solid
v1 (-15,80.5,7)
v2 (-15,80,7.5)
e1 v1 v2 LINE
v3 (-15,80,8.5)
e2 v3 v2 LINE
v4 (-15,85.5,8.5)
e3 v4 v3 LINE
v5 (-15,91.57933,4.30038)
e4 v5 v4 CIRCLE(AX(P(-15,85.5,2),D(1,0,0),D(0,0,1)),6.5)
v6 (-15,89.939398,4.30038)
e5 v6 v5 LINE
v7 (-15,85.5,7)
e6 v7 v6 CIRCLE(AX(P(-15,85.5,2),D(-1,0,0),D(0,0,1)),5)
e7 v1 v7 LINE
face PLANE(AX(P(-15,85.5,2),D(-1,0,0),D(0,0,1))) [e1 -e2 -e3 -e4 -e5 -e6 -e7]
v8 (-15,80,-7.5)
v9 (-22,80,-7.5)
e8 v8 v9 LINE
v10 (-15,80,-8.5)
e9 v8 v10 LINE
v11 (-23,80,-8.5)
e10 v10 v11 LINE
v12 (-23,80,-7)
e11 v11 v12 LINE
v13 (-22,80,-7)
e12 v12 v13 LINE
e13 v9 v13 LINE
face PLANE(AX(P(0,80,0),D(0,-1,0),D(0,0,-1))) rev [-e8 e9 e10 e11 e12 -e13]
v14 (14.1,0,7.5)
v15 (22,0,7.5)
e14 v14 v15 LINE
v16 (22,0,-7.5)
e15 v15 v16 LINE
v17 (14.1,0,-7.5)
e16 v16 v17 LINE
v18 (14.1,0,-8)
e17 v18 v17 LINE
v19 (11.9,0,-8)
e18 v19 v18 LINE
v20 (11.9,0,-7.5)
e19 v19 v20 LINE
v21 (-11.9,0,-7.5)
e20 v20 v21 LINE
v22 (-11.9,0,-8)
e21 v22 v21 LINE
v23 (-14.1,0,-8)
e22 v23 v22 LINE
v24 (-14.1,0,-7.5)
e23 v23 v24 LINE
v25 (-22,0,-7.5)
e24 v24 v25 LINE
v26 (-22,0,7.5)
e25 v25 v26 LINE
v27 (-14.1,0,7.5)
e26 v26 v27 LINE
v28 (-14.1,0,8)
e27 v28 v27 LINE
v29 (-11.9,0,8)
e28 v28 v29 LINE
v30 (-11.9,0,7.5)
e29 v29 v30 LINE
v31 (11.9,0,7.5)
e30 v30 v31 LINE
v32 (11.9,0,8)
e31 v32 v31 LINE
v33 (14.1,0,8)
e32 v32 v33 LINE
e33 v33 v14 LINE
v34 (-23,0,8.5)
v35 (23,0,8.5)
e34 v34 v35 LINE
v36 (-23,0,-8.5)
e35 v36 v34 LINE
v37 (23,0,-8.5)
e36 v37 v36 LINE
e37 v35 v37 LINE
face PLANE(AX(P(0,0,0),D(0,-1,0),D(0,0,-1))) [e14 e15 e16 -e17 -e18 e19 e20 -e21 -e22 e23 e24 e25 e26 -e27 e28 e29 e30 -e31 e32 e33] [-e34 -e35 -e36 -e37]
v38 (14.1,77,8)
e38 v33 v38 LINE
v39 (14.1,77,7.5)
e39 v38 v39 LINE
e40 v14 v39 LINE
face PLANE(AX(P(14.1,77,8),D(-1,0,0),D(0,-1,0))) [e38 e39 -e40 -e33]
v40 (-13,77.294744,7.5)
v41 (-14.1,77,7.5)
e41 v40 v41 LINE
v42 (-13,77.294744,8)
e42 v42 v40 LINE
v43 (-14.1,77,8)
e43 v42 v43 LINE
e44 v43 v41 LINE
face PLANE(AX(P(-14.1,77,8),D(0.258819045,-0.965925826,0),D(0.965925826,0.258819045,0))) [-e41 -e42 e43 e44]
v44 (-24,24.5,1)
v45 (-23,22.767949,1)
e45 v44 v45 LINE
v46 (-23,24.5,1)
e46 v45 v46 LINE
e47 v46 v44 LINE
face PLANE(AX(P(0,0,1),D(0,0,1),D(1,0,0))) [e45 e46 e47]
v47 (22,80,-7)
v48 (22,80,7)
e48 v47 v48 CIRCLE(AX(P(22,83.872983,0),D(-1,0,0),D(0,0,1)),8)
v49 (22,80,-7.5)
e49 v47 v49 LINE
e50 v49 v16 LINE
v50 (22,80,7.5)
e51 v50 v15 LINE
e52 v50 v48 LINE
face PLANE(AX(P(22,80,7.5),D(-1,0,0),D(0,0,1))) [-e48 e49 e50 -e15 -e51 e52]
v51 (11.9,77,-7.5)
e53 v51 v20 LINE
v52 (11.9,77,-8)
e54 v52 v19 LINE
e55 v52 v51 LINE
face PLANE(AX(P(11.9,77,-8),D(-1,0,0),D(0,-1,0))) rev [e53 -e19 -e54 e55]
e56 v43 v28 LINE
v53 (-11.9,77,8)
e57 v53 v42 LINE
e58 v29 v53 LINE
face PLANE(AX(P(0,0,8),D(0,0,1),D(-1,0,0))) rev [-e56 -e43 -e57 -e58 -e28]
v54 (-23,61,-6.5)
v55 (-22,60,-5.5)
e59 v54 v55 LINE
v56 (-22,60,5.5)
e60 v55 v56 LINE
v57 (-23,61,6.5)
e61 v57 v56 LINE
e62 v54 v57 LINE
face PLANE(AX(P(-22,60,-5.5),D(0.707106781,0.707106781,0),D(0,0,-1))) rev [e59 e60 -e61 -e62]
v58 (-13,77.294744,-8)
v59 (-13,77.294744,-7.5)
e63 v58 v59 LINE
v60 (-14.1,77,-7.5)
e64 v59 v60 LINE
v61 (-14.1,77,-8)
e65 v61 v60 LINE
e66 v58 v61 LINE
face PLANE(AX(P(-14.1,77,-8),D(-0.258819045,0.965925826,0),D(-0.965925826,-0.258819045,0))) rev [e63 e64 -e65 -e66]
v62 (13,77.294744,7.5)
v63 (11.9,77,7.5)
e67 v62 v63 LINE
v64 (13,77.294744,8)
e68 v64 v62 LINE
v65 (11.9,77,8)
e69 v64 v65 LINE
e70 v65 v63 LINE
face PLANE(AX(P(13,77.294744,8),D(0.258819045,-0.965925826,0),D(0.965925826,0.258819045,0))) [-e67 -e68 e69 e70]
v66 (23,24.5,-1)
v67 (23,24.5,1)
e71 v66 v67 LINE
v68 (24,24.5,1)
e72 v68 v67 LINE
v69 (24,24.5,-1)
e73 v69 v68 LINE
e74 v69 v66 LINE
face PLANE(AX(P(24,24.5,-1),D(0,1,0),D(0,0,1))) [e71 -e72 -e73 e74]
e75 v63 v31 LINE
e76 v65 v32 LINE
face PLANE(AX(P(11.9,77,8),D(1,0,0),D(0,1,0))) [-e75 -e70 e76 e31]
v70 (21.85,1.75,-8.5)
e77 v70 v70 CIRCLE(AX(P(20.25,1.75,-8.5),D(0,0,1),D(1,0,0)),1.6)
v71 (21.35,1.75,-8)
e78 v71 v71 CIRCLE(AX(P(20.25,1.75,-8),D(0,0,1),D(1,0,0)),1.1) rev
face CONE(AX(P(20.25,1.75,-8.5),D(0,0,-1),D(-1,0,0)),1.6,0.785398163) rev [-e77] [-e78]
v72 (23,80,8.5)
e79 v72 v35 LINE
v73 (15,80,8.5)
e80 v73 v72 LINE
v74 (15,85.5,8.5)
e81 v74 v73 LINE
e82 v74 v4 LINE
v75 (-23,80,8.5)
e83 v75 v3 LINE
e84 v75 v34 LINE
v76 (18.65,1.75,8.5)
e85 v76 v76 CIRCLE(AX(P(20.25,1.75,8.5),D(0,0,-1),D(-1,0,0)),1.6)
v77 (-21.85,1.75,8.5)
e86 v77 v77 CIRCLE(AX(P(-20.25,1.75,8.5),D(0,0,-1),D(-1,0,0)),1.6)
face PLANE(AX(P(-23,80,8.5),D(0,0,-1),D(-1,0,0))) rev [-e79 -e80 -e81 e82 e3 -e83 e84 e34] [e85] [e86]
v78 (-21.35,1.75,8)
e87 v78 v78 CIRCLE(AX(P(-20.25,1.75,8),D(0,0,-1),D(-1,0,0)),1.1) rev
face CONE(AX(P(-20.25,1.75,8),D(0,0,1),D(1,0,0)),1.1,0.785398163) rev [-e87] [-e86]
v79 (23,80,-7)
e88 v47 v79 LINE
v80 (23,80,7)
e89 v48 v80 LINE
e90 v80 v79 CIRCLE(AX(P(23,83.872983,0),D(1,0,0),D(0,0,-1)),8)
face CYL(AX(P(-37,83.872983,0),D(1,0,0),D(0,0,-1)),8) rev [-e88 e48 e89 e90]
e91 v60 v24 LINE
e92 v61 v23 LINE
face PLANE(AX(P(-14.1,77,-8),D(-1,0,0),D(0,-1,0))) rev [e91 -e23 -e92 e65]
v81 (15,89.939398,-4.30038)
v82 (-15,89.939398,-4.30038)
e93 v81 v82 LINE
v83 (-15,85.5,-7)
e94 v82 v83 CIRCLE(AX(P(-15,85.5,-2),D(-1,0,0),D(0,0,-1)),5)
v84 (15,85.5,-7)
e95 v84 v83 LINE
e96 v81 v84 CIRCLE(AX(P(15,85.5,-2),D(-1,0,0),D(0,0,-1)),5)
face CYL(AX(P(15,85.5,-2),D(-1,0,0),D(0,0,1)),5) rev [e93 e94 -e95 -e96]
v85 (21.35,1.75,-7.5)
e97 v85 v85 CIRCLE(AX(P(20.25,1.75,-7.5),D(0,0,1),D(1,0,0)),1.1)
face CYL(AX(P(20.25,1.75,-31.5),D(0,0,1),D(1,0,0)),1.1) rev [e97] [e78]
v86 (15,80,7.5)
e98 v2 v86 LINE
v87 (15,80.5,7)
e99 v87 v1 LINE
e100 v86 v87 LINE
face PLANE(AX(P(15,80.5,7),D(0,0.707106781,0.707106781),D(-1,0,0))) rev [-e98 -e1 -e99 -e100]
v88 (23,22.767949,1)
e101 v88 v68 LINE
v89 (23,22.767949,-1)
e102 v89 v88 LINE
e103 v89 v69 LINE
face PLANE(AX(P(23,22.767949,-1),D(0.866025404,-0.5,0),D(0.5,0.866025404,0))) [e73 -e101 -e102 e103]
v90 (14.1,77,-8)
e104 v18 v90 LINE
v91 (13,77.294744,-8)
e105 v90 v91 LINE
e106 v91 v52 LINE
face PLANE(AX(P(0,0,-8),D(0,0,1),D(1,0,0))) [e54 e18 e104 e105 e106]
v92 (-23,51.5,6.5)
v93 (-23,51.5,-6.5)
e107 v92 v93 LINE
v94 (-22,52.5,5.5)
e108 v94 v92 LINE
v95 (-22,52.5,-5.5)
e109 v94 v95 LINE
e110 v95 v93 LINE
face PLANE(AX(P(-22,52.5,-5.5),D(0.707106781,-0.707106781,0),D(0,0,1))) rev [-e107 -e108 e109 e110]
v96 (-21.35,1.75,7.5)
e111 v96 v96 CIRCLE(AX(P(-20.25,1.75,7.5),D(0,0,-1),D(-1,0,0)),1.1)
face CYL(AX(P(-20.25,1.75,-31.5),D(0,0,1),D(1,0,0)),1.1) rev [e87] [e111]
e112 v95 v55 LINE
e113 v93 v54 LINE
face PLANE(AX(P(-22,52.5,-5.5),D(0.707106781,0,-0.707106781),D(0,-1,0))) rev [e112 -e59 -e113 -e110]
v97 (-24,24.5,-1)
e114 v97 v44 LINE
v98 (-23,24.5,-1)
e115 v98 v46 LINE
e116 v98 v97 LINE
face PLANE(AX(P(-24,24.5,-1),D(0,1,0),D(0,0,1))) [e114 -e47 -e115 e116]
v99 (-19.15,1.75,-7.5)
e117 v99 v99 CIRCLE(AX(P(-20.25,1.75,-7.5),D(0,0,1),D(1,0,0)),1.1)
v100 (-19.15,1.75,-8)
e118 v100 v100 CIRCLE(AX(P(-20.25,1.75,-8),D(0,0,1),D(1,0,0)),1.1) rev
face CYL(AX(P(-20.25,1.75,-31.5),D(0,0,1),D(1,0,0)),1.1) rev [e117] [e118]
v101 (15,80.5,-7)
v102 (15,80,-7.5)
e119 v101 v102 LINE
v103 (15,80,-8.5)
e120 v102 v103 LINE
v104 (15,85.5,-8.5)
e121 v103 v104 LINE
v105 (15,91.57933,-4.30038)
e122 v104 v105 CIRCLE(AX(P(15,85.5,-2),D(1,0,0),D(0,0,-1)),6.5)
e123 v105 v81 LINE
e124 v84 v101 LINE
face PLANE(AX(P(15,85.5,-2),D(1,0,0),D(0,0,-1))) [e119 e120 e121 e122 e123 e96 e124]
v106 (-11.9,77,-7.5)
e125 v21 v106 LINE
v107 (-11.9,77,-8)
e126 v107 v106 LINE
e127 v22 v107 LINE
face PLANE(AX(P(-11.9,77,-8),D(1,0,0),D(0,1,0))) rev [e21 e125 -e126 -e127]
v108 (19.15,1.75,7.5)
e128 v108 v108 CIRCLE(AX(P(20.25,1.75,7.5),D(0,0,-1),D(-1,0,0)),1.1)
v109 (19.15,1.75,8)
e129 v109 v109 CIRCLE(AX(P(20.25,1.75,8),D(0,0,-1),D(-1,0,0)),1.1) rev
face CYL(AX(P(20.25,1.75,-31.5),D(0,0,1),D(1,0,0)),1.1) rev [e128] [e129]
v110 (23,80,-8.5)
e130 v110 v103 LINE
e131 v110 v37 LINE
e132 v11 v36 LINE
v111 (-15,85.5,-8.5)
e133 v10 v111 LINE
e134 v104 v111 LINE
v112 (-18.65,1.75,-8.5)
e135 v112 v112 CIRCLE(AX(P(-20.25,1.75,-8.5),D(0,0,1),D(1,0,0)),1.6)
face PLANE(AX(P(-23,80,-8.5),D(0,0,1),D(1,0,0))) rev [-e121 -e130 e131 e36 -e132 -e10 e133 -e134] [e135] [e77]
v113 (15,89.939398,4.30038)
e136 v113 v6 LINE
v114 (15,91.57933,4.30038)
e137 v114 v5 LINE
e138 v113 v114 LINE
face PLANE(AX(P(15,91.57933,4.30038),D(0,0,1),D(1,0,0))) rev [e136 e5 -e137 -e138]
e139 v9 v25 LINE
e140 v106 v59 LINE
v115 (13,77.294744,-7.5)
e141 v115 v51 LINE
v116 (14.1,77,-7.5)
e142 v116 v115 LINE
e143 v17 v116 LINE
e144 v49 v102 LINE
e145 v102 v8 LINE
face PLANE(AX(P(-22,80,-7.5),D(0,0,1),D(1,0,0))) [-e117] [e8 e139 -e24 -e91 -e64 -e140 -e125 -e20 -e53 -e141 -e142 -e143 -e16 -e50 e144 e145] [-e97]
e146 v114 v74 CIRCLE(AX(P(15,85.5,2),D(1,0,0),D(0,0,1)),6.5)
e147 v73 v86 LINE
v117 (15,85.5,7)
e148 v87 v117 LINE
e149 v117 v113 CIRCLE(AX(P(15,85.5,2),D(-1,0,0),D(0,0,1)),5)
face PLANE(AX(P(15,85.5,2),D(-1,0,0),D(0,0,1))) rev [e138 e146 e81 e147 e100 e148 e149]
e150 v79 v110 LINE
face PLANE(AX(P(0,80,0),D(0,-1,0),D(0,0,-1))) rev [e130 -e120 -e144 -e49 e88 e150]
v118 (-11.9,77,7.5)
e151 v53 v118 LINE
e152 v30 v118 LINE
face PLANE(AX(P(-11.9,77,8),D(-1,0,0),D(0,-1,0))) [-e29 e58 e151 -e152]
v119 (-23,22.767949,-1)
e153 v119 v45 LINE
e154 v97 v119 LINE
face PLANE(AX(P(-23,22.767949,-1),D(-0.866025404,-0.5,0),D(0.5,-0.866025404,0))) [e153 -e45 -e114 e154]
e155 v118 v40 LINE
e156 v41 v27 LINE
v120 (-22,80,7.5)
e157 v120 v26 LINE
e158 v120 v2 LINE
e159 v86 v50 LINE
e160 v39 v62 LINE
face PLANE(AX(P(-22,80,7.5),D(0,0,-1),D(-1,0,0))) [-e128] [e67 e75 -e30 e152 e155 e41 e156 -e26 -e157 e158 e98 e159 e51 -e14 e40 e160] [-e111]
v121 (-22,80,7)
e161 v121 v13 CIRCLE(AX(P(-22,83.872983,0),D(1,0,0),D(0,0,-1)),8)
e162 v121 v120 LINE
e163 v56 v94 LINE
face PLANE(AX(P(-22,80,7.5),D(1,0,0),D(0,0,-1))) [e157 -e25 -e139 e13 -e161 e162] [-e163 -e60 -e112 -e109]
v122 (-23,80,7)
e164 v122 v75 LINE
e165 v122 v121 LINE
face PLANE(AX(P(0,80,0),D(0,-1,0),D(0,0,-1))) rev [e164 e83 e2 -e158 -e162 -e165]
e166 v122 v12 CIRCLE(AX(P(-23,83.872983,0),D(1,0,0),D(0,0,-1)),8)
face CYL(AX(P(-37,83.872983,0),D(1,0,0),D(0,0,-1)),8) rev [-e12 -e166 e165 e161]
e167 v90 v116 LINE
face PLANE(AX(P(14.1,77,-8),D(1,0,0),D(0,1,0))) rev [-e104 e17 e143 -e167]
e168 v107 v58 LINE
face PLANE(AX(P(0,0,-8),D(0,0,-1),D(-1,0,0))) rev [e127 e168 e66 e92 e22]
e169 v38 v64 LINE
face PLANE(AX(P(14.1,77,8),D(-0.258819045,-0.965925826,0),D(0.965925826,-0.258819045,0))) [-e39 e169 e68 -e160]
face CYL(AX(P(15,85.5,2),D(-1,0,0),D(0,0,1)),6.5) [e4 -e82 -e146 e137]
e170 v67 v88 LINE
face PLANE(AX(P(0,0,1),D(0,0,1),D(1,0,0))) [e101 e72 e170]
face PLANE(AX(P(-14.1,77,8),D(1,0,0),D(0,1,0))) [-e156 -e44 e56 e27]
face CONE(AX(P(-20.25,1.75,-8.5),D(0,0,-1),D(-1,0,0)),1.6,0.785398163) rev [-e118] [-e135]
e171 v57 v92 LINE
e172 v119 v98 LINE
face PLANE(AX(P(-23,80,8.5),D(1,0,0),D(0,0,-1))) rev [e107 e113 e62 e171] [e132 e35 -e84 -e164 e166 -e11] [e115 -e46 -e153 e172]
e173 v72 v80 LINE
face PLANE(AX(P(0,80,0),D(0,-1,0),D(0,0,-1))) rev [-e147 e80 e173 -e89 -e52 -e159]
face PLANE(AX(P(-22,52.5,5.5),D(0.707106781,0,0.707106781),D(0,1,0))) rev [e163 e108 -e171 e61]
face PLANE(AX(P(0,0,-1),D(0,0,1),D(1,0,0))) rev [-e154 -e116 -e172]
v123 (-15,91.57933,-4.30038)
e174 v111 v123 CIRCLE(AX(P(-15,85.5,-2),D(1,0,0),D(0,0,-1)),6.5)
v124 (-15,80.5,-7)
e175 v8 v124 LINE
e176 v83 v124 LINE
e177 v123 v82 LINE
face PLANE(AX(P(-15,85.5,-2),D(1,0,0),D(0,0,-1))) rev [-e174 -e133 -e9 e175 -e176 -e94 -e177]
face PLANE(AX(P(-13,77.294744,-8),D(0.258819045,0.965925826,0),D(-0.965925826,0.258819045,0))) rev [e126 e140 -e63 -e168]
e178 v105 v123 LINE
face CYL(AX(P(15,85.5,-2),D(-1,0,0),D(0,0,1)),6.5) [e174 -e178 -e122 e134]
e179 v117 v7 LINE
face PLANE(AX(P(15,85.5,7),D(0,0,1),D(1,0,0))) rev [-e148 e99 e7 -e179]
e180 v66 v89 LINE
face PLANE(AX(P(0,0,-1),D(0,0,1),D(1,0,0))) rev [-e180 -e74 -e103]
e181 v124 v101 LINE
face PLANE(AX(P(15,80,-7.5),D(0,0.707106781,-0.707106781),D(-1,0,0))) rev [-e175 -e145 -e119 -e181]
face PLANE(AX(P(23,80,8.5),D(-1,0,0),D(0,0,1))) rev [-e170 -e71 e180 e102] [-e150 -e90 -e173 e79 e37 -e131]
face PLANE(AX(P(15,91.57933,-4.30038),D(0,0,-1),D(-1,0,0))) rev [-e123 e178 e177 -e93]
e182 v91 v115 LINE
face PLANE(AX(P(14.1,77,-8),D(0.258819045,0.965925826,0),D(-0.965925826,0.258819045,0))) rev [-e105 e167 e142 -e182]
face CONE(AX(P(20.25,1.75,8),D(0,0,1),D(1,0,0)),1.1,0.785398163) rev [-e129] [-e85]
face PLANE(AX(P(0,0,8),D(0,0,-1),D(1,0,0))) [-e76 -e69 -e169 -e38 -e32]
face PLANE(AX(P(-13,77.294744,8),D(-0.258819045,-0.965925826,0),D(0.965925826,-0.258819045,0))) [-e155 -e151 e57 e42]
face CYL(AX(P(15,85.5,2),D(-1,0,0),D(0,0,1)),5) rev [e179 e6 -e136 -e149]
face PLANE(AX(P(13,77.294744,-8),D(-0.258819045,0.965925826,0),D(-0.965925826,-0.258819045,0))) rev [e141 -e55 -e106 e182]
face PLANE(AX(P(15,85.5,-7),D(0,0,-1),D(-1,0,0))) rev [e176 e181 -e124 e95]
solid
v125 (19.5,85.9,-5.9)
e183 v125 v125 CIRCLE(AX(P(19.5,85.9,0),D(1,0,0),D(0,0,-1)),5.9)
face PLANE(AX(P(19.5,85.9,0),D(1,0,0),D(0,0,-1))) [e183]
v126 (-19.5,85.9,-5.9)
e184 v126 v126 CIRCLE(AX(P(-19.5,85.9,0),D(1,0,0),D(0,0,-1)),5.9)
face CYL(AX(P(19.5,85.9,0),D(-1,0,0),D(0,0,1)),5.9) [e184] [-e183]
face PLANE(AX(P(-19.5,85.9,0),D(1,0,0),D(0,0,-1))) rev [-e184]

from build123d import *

# Parameters (mm, degrees)
SKETCH_1_W          = 46
SKETCH_1_H          = 17
SKETCH_1_W_2        = 44
SKETCH_1_H_2        = 15
EXTRUDE_1_DEPTH     = 80
SKETCH_4_W          = 11
SKETCH_4_H          = 7.5
CUT_EXTRUDE_1_DEPTH = 30
SKETCH_6_R          = 5.9
EXTRUDE_4_DEPTH     = 19.5
EXTRUDE_3_DEPTH     = 15
CUT_EXTRUDE_2_DEPTH = 60
CUT_EXTRUDE_3_DEPTH = 0.5
CHAMFER_1_SIZE      = 1
EXTRUDE_START       = -7.5
EXTRUDE_7_DEPTH     = 2
CHAMFER_2_SIZE      = 0.5
SKETCH_15_R         = 1.1
CUT_EXTRUDE_5_DEPTH = 40
CHAMFER_3_SIZE      = 0.5


with BuildPart() as part:
    # 草图1 → 凸台-拉伸1 (new body)
    with BuildSketch(Plane(origin=(0, 0, 0), x_dir=(1, 0, 0), z_dir=(0, 1, 0))):
        Rectangle(SKETCH_1_W, SKETCH_1_H)
        Rectangle(SKETCH_1_W_2, SKETCH_1_H_2, mode=Mode.SUBTRACT)
    extrude(amount=EXTRUDE_1_DEPTH)

    # 草图4 → 切除-拉伸1 (cut)
    with BuildSketch(Plane.ZY.offset(23)):
        with Locations((0, 56.25)):
            Rectangle(SKETCH_4_W, SKETCH_4_H)
    extrude(amount=-CUT_EXTRUDE_1_DEPTH, mode=Mode.SUBTRACT)

    # 草图3 → 凸台-拉伸3 (add, symmetric)
    with BuildSketch(Plane(origin=(0, 0, 0), x_dir=(0, 0, -1), z_dir=(1, 0, 0))):
        with BuildLine():
            Line((-8.5, 80), (-8.5, 85.5))
            ThreePointArc((-8.5, 85.5), (-7.34801212, 89.194423684), (-4.300379581, 91.579330044))
            Line((-4.300379581, 91.579330044), (-4.300379581, 89.939397907))
            ThreePointArc((-4.300379581, 89.939397907), (-6.272112938, 88.097893579), (-7, 85.5))
            Line((-7, 85.5), (-7, 80))
            Line((-7, 80), (-8.5, 80))
        make_face()
        with BuildLine():
            Line((4.300379581, 91.579330044), (4.300379581, 89.939397907))
            ThreePointArc((4.300379581, 89.939397907), (6.272112938, 88.097893579), (7, 85.5))
            Line((7, 85.5), (7, 80))
            Line((7, 80), (8.5, 80))
            Line((8.5, 80), (8.5, 85.5))
            ThreePointArc((8.5, 85.5), (7.34801212, 89.194423684), (4.300379581, 91.579330044))
        make_face()
    extrude(amount=EXTRUDE_3_DEPTH, both=True)

    # 草图8 → 切除-拉伸2 (cut)
    with BuildSketch(Plane(origin=(23, 0, 0), x_dir=(0, 0, -1), z_dir=(1, 0, 0))):
        with BuildLine():
            Line((-7, 80), (7, 80))
            ThreePointArc((7, 80), (0, 75.872983346), (-7, 80))
        make_face()
    extrude(amount=-CUT_EXTRUDE_2_DEPTH, mode=Mode.SUBTRACT)

    # 草图11 → 切除-拉伸3 (cut)
    with BuildSketch(Plane.XY.offset(-7.5)):
        Polygon((-14.1, 77), (-14.1, 0), (-11.9, 0), (-11.9, 77), (-13, 77.294744112), align=None)
        Polygon((11.9, 77), (11.9, 0), (14.1, 0), (14.1, 77), (13, 77.294744112), align=None)
    cut_extrude_3 = extrude(amount=-CUT_EXTRUDE_3_DEPTH, mode=Mode.SUBTRACT)

    # 镜向1: 切除-拉伸3 across plane
    add(cut_extrude_3.mirror(Plane.XY), mode=Mode.SUBTRACT)

    # 倒角1
    chamfer_1_edges = [part.edges().sort_by_distance(p)[0] for p in [
        (-23, 56.25, 5.5),
        (-23, 60, 0),
        (-23, 56.25, -5.5),
        (-23, 52.5, 0),
    ]]
    chamfer(chamfer_1_edges, length=CHAMFER_1_SIZE - 0.0001)  # a hair under: the kernel refuses the full size

    # 草图13 → 凸台-拉伸7 (add)
    with BuildSketch(Plane.XY.offset(8.5).offset(EXTRUDE_START)):
        Polygon((-23, 22.767949192), (-24, 24.5), (-23, 24.5), align=None)
        Polygon((23, 24.5), (23, 22.767949192), (24, 24.5), align=None)
    extrude(amount=-EXTRUDE_7_DEPTH)

    # 倒角2
    chamfer_2_edges = [part.edges().sort_by_distance(p)[0] for p in [
        (0, 80, 7),
        (0, 80, -7),
    ]]
    chamfer(chamfer_2_edges, length=CHAMFER_2_SIZE - 0.0001)  # a hair under: the kernel refuses the full size

    # 草图15 → 切除-拉伸5 (cut)
    with BuildSketch(Plane.XY.offset(8.5)):
        with Locations((-20.25, 1.75)):
            Circle(SKETCH_15_R)
        with Locations((20.25, 1.75)):
            Circle(SKETCH_15_R)
    extrude(amount=-CUT_EXTRUDE_5_DEPTH, mode=Mode.SUBTRACT)

    # 倒角3
    chamfer_3_edges = [part.edges().sort_by_distance(p)[0] for p in [
        (19.15, 1.75, -8.5),
        (19.15, 1.75, 8.5),
        (-21.35, 1.75, -8.5),
        (-21.35, 1.75, 8.5),
    ]]
    chamfer(chamfer_3_edges, length=CHAMFER_3_SIZE)


with BuildPart() as body_2:
    # 草图6 → 凸台-拉伸4 (new, symmetric)
    with BuildSketch(Plane(origin=(0, 0, 0), x_dir=(0, 0, -1), z_dir=(1, 0, 0))):
        with Locations((0, 85.9)):
            Circle(SKETCH_6_R)
    extrude(amount=EXTRUDE_4_DEPTH, both=True)


solid = Compound([part.part, body_2.part])
